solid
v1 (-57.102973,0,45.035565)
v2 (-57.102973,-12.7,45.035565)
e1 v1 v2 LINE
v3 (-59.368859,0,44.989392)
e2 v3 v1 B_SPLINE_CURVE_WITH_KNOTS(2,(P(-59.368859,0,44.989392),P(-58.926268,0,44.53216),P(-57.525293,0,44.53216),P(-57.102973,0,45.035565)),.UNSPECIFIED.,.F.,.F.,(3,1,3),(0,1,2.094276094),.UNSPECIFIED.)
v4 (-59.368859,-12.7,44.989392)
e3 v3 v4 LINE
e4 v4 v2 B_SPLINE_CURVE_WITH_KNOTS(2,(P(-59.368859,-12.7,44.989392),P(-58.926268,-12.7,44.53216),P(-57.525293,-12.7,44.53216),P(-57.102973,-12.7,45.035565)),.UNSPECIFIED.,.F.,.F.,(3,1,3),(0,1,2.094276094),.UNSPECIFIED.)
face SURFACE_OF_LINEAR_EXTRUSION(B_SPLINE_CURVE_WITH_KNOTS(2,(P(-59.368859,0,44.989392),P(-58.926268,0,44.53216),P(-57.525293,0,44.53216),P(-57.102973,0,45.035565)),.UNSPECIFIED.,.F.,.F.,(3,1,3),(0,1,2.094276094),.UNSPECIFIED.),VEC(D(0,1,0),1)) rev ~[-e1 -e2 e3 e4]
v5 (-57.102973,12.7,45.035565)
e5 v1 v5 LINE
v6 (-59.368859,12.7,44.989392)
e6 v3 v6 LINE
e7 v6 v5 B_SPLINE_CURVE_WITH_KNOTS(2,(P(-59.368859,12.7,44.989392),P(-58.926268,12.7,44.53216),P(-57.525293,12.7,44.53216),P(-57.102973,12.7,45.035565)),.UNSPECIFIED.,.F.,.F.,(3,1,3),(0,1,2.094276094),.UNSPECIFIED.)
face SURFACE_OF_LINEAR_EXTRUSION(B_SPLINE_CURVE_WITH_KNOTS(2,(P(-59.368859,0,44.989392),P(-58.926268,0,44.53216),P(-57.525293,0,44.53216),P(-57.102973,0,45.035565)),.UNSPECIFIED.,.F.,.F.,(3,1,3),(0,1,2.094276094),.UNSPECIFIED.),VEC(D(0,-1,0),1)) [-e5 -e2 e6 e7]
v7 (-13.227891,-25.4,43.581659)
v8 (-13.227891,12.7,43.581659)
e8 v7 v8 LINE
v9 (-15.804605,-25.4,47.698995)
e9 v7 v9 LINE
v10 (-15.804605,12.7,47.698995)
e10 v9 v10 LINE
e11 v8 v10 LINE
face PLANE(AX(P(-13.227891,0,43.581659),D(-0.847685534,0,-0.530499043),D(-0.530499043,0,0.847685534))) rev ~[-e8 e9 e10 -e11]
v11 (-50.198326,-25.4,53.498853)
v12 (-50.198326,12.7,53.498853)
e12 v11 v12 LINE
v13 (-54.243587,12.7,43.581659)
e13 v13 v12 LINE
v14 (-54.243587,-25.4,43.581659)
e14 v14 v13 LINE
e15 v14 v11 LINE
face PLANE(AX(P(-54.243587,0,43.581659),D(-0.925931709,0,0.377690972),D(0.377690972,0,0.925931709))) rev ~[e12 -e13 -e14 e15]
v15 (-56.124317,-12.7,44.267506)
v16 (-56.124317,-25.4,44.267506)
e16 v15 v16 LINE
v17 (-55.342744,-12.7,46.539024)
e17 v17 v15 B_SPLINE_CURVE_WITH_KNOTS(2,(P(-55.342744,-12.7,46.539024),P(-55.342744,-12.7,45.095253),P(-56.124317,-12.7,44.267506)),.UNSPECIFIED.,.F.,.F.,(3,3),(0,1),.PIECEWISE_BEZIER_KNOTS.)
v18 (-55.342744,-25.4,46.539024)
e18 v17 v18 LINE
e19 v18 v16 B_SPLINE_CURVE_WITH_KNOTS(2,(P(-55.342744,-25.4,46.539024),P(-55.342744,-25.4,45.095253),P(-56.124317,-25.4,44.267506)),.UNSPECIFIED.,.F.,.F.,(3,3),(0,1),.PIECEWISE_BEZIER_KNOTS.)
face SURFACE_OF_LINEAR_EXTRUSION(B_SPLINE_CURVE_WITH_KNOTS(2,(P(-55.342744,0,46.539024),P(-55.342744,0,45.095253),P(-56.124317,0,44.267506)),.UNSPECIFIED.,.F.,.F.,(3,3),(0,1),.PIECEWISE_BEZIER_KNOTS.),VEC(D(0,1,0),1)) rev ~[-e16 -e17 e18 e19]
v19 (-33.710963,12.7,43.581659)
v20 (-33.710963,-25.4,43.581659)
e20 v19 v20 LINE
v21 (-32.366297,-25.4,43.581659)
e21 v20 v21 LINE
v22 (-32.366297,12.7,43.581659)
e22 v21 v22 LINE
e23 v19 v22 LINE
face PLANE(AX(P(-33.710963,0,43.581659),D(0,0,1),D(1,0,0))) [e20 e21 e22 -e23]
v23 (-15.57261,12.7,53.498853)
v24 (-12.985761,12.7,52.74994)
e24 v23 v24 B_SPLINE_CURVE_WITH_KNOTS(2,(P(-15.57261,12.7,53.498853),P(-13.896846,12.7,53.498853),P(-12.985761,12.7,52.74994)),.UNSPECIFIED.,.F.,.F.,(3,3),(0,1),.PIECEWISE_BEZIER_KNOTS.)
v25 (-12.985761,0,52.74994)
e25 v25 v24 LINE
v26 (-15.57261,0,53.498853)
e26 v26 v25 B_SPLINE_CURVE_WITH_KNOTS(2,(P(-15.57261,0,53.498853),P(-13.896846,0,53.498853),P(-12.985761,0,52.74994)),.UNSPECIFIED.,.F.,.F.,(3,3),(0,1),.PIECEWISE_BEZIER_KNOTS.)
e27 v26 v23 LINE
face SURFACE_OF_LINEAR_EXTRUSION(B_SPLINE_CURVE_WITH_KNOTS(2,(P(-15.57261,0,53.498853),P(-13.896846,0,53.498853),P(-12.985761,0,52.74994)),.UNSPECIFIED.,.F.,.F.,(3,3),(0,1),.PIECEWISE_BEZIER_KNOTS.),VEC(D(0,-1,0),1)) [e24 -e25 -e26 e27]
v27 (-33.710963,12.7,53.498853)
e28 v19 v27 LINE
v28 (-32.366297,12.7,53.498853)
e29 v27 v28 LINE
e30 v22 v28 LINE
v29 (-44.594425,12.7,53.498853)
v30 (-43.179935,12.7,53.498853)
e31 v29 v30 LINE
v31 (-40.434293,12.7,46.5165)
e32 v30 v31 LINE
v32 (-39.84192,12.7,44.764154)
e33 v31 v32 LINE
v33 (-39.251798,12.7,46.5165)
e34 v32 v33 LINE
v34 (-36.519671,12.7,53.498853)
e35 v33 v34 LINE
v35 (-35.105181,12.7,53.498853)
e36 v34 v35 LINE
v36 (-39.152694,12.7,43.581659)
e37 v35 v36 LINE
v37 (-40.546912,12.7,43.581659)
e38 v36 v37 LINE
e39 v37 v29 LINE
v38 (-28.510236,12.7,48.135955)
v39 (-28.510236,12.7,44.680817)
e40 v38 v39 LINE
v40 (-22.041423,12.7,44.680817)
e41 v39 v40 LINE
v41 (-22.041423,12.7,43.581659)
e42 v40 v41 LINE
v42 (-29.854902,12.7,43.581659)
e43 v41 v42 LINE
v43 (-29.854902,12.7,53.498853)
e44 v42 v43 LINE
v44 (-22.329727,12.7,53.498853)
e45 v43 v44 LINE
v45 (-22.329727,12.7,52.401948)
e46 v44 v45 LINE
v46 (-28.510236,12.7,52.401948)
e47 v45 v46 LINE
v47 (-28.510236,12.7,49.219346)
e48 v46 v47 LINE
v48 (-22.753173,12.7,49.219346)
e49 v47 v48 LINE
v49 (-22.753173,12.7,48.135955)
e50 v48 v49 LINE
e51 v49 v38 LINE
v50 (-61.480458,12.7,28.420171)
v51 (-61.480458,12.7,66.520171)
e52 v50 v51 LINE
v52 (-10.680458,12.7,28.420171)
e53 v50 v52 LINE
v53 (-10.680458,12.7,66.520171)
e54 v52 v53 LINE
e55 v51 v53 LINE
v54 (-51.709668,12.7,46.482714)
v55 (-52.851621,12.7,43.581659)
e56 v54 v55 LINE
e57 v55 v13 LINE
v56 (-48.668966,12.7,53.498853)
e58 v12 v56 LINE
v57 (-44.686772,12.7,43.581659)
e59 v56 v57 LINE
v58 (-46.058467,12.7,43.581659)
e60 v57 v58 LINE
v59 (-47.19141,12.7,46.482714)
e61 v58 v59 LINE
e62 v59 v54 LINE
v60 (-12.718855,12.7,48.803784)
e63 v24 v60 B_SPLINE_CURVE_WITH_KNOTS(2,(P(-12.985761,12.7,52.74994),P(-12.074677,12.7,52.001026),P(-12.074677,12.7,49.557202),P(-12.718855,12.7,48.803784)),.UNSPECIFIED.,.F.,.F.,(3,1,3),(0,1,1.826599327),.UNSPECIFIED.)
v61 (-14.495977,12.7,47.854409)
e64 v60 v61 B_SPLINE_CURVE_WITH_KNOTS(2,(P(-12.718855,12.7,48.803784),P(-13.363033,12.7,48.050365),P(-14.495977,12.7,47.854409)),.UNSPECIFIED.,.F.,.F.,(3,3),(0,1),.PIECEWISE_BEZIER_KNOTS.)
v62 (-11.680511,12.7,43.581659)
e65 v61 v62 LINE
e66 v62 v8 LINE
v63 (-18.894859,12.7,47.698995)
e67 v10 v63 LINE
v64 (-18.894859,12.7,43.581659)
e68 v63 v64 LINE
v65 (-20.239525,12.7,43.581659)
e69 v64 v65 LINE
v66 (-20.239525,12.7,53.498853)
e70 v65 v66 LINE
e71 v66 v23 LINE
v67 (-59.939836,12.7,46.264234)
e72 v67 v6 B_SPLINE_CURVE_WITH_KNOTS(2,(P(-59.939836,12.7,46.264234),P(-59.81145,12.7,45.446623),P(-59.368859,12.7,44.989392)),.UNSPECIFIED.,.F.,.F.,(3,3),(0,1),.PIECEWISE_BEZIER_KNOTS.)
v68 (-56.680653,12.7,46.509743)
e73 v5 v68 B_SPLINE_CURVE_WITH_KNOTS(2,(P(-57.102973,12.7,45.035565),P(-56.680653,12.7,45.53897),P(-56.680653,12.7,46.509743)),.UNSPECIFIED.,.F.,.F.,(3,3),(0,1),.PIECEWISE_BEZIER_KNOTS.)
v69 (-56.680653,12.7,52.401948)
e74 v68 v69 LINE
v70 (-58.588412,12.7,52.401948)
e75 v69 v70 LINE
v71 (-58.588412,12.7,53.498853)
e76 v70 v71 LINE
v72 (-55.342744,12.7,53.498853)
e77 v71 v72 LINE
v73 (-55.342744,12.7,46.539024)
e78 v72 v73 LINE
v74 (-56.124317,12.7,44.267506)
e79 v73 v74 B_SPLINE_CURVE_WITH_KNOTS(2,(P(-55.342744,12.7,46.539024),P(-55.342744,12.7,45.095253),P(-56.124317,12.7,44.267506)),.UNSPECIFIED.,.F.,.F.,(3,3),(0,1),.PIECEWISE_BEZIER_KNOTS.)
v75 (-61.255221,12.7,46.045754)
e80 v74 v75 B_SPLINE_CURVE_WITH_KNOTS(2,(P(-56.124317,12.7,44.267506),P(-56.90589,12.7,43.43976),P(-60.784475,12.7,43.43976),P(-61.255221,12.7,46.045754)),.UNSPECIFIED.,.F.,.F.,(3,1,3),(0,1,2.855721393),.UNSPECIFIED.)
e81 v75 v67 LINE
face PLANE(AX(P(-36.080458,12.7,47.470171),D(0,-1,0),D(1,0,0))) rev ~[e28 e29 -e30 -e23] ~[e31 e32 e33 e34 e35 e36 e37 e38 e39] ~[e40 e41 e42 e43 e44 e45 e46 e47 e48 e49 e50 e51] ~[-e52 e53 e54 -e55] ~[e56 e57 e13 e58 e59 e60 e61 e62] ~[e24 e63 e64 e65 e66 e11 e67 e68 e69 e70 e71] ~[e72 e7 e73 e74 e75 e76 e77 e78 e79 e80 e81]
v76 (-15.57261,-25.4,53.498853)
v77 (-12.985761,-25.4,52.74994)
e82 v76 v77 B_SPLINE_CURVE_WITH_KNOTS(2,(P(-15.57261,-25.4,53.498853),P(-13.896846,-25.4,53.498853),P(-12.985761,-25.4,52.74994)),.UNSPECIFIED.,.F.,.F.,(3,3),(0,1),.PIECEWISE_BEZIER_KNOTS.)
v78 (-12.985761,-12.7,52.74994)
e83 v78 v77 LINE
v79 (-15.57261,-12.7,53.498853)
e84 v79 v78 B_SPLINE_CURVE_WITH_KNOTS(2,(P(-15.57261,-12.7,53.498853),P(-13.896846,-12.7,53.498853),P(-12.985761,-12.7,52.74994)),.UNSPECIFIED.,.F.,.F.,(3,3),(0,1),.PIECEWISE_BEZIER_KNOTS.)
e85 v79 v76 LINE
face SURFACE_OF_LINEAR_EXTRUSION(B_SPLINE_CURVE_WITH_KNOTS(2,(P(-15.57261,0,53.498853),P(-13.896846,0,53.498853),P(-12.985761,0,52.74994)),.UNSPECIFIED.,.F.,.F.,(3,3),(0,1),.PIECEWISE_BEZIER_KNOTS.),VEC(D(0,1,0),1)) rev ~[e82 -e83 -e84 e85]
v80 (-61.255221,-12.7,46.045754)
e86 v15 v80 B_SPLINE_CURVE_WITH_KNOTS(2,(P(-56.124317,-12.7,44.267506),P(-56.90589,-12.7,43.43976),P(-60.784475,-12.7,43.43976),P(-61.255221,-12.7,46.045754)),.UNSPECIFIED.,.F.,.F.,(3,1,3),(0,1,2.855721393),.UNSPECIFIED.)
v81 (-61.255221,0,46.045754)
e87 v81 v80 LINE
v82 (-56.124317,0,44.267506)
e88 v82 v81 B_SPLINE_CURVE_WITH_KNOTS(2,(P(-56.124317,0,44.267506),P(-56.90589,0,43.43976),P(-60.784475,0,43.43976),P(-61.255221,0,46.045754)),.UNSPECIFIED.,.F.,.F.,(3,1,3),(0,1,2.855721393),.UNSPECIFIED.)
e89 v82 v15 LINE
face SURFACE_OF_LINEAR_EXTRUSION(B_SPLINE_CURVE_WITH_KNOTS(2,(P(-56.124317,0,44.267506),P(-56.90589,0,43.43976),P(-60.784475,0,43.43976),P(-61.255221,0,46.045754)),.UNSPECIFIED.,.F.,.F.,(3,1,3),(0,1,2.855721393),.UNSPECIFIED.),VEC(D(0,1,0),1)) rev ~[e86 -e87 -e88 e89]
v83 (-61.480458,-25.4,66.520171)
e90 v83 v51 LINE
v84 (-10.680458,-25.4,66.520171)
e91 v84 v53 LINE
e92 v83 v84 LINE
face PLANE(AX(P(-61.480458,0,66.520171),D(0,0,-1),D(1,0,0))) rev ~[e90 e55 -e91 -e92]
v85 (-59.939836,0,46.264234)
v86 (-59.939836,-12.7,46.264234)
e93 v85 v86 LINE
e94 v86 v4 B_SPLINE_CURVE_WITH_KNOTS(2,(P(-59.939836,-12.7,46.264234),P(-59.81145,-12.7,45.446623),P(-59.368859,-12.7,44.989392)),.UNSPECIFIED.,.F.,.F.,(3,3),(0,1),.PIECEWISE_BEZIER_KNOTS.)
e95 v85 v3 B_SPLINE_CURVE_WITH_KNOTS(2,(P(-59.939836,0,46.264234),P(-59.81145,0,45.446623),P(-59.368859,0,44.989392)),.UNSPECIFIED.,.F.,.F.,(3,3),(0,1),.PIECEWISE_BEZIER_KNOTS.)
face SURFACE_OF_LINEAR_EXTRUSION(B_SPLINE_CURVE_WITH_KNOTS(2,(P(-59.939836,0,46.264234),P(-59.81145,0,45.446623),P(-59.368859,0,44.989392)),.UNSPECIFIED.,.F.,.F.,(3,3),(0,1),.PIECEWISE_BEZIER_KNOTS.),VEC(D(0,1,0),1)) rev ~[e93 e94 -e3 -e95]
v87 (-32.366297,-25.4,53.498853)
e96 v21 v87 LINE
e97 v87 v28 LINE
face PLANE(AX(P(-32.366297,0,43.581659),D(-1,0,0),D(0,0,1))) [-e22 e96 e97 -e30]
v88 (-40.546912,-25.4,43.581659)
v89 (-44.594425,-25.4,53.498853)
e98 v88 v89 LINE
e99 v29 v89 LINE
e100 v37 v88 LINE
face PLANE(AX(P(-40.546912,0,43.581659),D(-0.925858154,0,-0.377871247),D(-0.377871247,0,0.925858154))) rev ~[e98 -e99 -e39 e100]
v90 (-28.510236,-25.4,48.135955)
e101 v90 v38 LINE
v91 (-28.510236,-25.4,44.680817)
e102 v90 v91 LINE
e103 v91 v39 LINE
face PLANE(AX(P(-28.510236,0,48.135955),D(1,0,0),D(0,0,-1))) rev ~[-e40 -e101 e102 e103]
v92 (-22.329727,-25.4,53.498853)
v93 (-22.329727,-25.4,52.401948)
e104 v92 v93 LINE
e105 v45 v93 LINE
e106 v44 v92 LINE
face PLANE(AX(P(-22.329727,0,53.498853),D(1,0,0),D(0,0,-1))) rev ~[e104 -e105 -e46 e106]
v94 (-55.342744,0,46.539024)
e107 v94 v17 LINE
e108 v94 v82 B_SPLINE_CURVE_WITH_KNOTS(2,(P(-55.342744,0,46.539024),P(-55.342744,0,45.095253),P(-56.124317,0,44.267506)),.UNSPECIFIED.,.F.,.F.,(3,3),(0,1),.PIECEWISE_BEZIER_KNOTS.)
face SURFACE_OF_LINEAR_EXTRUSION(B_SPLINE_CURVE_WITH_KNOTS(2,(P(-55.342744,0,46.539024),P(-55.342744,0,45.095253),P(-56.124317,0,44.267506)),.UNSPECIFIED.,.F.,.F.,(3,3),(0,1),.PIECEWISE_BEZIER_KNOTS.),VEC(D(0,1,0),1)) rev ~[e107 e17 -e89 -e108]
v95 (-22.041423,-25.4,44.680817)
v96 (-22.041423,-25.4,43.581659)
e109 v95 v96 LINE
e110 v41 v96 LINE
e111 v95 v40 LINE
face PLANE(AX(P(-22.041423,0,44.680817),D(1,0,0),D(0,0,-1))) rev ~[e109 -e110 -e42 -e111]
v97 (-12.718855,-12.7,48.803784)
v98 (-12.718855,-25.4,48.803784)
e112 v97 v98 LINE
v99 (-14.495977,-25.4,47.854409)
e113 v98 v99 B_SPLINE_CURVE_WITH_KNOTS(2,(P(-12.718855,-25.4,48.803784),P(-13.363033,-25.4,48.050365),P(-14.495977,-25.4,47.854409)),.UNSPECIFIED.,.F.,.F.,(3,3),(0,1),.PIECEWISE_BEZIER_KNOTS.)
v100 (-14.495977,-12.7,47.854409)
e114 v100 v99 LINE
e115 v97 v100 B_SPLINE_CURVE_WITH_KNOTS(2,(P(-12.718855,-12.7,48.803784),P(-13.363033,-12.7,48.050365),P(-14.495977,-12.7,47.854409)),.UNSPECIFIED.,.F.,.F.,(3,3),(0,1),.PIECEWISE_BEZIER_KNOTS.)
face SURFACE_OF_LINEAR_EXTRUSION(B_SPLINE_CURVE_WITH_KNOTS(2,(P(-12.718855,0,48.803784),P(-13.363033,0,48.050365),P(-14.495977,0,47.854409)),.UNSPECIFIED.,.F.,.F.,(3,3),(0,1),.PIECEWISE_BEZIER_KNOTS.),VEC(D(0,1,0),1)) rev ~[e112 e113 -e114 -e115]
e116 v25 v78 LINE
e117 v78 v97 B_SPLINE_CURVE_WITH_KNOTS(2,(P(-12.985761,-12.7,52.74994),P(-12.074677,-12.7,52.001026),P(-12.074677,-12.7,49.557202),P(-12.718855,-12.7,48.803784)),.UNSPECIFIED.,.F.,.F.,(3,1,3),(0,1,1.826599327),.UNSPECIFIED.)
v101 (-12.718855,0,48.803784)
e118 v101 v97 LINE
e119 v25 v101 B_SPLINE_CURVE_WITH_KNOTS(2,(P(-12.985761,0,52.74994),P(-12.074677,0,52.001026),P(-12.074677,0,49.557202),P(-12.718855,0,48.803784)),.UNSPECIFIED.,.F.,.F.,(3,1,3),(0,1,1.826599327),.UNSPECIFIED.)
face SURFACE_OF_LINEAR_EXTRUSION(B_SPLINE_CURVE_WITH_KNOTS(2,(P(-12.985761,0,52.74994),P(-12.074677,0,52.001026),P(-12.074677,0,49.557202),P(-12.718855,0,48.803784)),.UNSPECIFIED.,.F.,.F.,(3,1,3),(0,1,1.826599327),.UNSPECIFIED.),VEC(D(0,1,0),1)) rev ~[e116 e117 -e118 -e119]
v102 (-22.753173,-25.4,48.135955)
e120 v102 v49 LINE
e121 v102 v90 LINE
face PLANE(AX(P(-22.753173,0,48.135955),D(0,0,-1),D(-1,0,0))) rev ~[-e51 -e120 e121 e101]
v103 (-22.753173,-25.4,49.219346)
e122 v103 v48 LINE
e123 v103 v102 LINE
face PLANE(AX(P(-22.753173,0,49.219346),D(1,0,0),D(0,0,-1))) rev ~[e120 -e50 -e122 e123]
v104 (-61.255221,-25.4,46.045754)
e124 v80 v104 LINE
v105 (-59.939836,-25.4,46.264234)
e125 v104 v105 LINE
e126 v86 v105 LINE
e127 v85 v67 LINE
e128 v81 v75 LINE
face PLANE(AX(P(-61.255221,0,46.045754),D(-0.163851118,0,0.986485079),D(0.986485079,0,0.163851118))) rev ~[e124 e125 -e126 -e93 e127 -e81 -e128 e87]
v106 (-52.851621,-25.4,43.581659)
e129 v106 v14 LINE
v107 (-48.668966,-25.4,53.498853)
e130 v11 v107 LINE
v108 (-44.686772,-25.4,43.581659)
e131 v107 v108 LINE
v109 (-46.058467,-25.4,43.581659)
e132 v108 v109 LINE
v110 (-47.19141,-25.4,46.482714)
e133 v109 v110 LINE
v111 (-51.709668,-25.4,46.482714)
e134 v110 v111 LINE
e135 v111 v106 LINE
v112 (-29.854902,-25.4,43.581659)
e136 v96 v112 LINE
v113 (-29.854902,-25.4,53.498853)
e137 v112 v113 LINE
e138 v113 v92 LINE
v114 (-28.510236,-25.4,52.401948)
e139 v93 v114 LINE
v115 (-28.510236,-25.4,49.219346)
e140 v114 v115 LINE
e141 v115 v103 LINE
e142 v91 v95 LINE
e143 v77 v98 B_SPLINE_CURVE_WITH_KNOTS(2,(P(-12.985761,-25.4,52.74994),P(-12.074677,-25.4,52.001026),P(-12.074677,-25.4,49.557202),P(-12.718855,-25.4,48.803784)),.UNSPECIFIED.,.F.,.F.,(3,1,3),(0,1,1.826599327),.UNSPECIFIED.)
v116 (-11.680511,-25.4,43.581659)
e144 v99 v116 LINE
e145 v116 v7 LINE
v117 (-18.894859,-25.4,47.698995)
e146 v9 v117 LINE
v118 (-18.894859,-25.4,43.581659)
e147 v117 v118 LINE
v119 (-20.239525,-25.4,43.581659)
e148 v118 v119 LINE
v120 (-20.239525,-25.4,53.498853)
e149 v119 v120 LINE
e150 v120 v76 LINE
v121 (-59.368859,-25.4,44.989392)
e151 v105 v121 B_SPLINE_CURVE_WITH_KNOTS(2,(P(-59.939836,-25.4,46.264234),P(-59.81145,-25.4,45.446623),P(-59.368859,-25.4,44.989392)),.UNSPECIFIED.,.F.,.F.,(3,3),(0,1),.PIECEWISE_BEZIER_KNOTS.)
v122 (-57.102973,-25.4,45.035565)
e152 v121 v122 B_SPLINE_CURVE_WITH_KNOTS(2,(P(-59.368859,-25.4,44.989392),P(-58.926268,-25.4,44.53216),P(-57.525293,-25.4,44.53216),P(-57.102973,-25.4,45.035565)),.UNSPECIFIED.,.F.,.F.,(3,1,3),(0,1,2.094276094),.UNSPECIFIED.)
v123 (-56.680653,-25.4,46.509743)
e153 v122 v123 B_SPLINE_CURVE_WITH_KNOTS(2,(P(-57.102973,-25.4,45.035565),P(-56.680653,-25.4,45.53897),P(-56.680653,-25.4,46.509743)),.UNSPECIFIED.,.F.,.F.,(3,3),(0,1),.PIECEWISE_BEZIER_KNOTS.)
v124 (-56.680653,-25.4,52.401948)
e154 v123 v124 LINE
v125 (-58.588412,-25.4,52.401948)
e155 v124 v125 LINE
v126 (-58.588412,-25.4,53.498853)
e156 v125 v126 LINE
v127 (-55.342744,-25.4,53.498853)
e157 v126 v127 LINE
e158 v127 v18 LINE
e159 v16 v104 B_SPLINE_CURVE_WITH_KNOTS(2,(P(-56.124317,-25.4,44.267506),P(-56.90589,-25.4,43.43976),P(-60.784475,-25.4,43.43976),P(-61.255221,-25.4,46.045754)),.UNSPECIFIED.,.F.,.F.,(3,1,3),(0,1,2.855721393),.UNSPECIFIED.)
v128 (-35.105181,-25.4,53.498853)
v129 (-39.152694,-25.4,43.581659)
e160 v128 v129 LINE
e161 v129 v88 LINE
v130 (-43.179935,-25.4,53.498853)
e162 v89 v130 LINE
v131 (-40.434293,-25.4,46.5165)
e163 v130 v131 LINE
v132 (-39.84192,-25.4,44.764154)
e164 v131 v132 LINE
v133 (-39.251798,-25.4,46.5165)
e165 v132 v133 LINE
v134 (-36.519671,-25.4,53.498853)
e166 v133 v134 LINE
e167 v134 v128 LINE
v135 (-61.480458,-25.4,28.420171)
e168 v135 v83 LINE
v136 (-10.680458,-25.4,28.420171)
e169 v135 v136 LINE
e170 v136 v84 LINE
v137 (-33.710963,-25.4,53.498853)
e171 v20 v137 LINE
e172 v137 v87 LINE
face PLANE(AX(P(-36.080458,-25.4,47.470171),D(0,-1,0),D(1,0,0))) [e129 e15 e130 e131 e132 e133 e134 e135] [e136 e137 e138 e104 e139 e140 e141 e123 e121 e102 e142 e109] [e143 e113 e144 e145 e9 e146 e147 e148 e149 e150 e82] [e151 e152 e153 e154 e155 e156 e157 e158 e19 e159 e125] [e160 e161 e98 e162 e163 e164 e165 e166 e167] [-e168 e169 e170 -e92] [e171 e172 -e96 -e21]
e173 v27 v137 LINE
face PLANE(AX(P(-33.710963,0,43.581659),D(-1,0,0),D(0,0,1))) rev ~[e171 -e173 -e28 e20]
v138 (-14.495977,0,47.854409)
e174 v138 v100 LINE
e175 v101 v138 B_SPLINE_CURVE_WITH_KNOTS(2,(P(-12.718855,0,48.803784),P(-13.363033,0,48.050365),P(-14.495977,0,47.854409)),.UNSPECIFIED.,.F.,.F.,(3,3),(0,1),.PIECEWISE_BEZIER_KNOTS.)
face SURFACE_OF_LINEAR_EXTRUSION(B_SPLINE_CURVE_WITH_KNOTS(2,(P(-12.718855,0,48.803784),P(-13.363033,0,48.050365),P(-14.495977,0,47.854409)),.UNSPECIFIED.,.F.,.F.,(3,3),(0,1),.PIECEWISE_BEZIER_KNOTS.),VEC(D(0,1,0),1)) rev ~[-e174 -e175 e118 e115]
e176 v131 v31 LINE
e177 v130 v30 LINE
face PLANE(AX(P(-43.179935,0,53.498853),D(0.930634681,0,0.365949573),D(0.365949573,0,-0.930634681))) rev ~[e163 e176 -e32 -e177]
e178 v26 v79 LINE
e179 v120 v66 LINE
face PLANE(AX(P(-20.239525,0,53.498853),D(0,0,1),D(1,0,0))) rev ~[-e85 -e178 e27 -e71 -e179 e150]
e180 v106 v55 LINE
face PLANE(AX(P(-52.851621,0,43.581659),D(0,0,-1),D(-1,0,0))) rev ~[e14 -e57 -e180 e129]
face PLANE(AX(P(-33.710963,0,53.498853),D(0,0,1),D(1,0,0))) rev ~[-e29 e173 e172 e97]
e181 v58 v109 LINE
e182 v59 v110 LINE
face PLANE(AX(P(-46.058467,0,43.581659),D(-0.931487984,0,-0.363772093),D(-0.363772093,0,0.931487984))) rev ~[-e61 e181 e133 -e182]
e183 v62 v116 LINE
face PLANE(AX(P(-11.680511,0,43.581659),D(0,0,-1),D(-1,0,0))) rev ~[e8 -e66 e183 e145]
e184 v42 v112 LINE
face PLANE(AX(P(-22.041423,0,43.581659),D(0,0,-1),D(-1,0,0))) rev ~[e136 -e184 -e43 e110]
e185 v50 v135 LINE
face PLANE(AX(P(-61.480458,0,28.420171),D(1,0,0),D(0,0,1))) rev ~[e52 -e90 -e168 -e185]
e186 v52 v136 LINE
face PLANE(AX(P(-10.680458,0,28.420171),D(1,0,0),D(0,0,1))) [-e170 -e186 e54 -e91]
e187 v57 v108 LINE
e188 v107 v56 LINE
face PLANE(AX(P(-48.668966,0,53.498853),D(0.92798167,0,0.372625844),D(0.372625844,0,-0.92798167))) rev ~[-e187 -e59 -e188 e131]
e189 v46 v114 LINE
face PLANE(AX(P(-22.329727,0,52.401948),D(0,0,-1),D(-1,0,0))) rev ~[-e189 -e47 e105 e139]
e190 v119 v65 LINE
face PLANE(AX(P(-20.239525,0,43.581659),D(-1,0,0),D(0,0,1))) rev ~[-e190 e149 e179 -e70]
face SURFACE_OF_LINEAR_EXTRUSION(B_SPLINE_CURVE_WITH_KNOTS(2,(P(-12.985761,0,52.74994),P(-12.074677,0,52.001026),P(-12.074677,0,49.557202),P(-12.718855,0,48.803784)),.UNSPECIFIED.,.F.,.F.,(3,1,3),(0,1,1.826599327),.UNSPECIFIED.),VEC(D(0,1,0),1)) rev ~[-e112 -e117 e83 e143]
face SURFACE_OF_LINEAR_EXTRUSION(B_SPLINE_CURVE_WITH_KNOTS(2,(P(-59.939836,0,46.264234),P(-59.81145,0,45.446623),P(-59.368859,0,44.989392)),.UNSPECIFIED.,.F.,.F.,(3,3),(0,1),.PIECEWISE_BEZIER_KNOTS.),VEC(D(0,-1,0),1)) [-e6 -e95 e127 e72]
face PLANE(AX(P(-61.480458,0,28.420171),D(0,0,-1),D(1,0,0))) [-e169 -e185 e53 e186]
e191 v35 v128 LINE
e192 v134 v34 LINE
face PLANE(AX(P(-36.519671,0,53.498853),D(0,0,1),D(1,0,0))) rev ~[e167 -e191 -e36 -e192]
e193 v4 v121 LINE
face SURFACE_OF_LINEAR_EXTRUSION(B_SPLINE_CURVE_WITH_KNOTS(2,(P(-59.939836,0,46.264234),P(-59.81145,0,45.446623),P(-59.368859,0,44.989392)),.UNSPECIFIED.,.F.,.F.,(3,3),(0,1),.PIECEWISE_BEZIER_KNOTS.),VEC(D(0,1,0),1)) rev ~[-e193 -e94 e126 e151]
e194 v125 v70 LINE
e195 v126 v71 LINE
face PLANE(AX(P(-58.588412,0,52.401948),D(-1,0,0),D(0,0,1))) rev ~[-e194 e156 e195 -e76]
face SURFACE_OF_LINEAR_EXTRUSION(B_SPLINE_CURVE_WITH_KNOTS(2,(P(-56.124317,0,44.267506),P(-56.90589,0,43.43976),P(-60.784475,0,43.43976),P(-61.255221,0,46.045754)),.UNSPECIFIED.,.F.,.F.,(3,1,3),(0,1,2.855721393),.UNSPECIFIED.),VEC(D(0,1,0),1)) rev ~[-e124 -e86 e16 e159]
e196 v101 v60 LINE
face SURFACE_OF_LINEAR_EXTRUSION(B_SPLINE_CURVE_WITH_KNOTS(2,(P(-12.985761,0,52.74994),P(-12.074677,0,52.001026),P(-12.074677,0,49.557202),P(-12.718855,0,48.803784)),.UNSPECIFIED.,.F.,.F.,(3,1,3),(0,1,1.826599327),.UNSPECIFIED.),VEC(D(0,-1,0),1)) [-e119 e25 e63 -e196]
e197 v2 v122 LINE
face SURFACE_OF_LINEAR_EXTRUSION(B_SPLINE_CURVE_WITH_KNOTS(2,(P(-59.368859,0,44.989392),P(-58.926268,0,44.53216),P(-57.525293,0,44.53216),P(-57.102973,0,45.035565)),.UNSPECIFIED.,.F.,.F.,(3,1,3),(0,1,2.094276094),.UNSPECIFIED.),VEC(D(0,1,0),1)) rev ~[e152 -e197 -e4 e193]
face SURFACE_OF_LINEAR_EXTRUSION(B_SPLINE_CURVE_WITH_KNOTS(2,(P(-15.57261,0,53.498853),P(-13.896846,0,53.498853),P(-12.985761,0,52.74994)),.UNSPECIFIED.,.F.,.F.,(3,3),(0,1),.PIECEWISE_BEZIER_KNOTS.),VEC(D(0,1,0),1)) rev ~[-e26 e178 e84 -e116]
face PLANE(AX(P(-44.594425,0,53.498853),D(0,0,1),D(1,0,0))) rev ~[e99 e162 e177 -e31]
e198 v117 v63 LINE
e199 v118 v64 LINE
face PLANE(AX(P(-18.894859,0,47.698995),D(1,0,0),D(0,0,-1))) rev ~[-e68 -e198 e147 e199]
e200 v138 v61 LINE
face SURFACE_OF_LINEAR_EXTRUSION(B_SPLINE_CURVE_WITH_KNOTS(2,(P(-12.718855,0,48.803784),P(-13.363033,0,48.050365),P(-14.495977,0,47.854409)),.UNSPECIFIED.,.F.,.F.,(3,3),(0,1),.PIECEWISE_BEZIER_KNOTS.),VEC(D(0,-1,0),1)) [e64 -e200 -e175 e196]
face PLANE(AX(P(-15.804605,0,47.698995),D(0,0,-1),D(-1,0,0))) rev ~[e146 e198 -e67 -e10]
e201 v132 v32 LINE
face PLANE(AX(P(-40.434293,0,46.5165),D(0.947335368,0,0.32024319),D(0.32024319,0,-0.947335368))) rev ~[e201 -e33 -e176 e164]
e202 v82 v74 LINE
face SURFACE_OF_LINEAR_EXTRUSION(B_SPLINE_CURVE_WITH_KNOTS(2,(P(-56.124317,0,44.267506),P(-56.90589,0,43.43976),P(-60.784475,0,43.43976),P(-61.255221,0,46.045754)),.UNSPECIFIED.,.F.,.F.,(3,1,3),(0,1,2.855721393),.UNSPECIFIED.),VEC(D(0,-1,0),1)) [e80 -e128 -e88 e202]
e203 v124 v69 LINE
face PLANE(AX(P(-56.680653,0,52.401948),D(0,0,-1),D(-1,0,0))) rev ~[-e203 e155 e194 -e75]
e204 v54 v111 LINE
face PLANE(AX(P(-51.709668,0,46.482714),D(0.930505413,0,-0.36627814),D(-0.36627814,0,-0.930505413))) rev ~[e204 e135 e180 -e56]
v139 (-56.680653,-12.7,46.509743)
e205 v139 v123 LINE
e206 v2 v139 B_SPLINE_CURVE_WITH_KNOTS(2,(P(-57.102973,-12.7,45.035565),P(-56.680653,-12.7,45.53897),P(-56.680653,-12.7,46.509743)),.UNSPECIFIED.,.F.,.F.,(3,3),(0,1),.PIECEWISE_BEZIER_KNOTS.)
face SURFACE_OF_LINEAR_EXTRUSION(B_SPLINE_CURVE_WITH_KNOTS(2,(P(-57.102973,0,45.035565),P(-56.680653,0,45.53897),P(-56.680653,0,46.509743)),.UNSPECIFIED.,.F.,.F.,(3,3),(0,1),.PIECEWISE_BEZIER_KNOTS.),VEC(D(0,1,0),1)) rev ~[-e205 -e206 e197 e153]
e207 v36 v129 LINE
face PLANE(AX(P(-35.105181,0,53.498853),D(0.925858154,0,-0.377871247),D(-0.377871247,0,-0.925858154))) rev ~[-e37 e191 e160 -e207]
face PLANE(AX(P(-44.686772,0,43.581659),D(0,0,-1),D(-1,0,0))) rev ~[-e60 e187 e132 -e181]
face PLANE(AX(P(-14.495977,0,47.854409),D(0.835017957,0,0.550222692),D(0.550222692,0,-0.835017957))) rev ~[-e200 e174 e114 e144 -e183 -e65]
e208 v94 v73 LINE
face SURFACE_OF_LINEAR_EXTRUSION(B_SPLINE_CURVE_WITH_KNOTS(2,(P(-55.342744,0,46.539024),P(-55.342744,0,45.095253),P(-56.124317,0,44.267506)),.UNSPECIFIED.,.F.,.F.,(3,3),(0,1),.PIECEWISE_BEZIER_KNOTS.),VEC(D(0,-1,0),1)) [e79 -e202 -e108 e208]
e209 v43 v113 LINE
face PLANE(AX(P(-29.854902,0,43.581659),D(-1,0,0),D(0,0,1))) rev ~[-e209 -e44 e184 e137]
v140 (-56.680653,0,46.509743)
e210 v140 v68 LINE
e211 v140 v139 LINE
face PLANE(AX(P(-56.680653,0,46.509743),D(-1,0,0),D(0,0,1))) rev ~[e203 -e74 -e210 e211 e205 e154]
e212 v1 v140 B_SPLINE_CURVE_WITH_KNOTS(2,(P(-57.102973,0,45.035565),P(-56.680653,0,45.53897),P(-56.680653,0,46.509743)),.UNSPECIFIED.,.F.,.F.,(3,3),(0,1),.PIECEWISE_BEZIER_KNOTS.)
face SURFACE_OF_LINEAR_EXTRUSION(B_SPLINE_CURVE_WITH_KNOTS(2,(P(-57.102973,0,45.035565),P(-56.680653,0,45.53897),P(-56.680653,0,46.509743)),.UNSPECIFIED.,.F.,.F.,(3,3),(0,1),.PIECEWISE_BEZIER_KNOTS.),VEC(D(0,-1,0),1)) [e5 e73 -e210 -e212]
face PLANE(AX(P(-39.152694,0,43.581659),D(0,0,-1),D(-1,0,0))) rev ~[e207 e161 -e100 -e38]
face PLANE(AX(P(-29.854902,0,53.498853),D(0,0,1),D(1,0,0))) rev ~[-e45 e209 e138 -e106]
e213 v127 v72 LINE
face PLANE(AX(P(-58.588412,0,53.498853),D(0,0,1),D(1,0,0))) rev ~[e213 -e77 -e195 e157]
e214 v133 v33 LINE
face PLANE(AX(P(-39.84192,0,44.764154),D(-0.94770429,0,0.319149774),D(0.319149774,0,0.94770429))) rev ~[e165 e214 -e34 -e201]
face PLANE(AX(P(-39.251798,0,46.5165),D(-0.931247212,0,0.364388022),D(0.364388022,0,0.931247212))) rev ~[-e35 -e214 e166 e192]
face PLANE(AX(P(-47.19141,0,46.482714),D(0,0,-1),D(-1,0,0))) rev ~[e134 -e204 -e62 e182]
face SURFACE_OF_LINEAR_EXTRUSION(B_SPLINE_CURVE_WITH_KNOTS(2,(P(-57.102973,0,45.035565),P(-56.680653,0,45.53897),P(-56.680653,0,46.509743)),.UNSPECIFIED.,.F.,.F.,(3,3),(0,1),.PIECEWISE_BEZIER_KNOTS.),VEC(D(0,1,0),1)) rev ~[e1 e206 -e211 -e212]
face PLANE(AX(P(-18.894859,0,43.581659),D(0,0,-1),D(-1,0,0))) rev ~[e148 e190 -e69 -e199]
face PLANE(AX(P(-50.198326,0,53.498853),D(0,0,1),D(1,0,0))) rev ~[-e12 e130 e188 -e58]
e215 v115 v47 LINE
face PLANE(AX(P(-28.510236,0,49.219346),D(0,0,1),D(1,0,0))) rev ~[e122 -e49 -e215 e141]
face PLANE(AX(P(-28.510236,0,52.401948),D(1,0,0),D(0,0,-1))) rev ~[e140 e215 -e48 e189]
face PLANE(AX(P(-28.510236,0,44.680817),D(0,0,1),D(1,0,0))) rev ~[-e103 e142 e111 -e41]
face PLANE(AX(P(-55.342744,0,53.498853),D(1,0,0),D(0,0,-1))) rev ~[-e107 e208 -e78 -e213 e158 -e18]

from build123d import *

# Parameters (mm, degrees)
F0_W     = 50.8
F0_H     = 38.1
F0_W_2   = 1.3446661346
F0_H_2   = 9.9171942893
F1_DEPTH = 12.7
F2_DEPTH = 25.4


with BuildPart() as f1:
    # F0 (on Front) → F1 (new body, symmetric)
    with BuildSketch(Plane.XZ):
        with Locations((-36.0804582015, 47.4701705396)):
            Rectangle(F0_W, F0_H)
        with BuildLine():
            add(Edge.make_bspline(
                [(-56.1243173839, 44.267506293), (-56.9058904973, 43.4397595518), (-58.2640708644, 43.4397595518)],
                knots=[0, 0, 0, 1, 1, 1], degree=2))
            add(Edge.make_bspline(
                [(-58.2640708644, 43.4397595518), (-60.7844752273, 43.4397595518), (-61.255220993, 46.0457540539)],
                knots=[0, 0, 0, 1, 1, 1], degree=2))
            Line((-61.255220993, 46.0457540539), (-59.9398356955, 46.2642341461))
            add(Edge.make_bspline(
                [(-59.9398356955, 46.2642341461), (-59.8114504867, 45.4466230794), (-59.368859372, 44.9893915462)],
                knots=[0, 0, 0, 1, 1, 1], degree=2))
            add(Edge.make_bspline(
                [(-59.368859372, 44.9893915462), (-58.9262682573, 44.5321600129), (-58.2573137482, 44.5321600129)],
                knots=[0, 0, 0, 1, 1, 1], degree=2))
            add(Edge.make_bspline(
                [(-58.2573137482, 44.5321600129), (-57.5252928206, 44.5321600129), (-57.1029730547, 45.0355651739)],
                knots=[0, 0, 0, 1, 1, 1], degree=2))
            add(Edge.make_bspline(
                [(-57.1029730547, 45.0355651739), (-56.6806532888, 45.5389703348), (-56.6806532888, 46.5097427034)],
                knots=[0, 0, 0, 1, 1, 1], degree=2))
            Line((-56.6806532888, 46.5097427034), (-56.6806532888, 52.4019480771))
            Line((-56.6806532888, 52.4019480771), (-58.5884124446, 52.4019480771))
            Line((-58.5884124446, 52.4019480771), (-58.5884124446, 53.4988532824))
            Line((-58.5884124446, 53.4988532824), (-55.3427442705, 53.4988532824))
            Line((-55.3427442705, 53.4988532824), (-55.3427442705, 46.5390235405))
            add(Edge.make_bspline(
                [(-55.3427442705, 46.5390235405), (-55.3427442705, 45.0952530341), (-56.1243173839, 44.267506293)],
                knots=[0, 0, 0, 1, 1, 1], degree=2))
        make_face(mode=Mode.SUBTRACT)
        Polygon((-44.6867719374, 43.5816589932), (-46.058466537, 43.5816589932), (-47.1914096957, 46.4827142384), (-51.7096680977, 46.4827142384), (-52.8516207447, 43.5816589932), (-54.2435866931, 43.5816589932), (-50.1983264288, 53.4988532824), (-48.6689657833, 53.4988532824), align=None, mode=Mode.SUBTRACT)
        Polygon((-35.1051810888, 53.4988532824), (-39.1526937251, 43.5816589932), (-40.5469120456, 43.5816589932), (-44.5944246819, 53.4988532824), (-43.1799350127, 53.4988532824), (-40.4342934413, 46.5164998196), (-39.841919583, 44.7641543377), (-39.2517980968, 46.5164998196), (-36.519670758, 53.4988532824), align=None, mode=Mode.SUBTRACT)
        with Locations((-33.038629701, 48.5402561378)):
            Rectangle(F0_W_2, F0_H_2, mode=Mode.SUBTRACT)
        Polygon((-22.0414229971, 43.5816589932), (-29.8549017592, 43.5816589932), (-29.8549017592, 53.4988532824), (-22.3297266239, 53.4988532824), (-22.3297266239, 52.4019480771), (-28.5102356245, 52.4019480771), (-28.5102356245, 49.2193463214), (-22.7531725759, 49.2193463214), (-22.7531725759, 48.1359553486), (-28.5102356245, 48.1359553486), (-28.5102356245, 44.6808165705), (-22.0414229971, 44.6808165705), align=None, mode=Mode.SUBTRACT)
        with BuildLine():
            Line((-11.6805114071, 43.5816589932), (-13.2278910293, 43.5816589932))
            Line((-13.2278910293, 43.5816589932), (-15.8046046943, 47.6989951641))
            Line((-15.8046046943, 47.6989951641), (-18.8948591946, 47.6989951641))
            Line((-18.8948591946, 47.6989951641), (-18.8948591946, 43.5816589932))
            Line((-18.8948591946, 43.5816589932), (-20.2395253293, 43.5816589932))
            Line((-20.2395253293, 43.5816589932), (-20.2395253293, 53.4988532824))
            Line((-20.2395253293, 53.4988532824), (-15.5726103696, 53.4988532824))
            add(Edge.make_bspline(
                [(-15.5726103696, 53.4988532824), (-13.8968455385, 53.4988532824), (-12.9857610302, 52.7499395642)],
                knots=[0, 0, 0, 1, 1, 1], degree=2))
            add(Edge.make_bspline(
                [(-12.9857610302, 52.7499395642), (-12.0746765219, 52.0010258461), (-12.0746765219, 50.6631168277)],
                knots=[0, 0, 0, 1, 1, 1], degree=2))
            add(Edge.make_bspline(
                [(-12.0746765219, 50.6631168277), (-12.0746765219, 49.5572021341), (-12.7188549382, 48.8037836717)],
                knots=[0, 0, 0, 1, 1, 1], degree=2))
            add(Edge.make_bspline(
                [(-12.7188549382, 48.8037836717), (-13.3630333544, 48.0503652094), (-14.4959765131, 47.854408838)],
                knots=[0, 0, 0, 1, 1, 1], degree=2))
            Line((-14.4959765131, 47.854408838), (-11.6805114071, 43.5816589932))
        make_face(mode=Mode.SUBTRACT)
    extrude(amount=F1_DEPTH, both=True)

    # F0 (on Front) → F2 (join)
    with BuildSketch(Plane.XZ):
        with Locations((-36.0804582015, 47.4701705396)):
            Rectangle(F0_W, F0_H)
        with BuildLine():
            add(Edge.make_bspline(
                [(-56.1243173839, 44.267506293), (-56.9058904973, 43.4397595518), (-58.2640708644, 43.4397595518)],
                knots=[0, 0, 0, 1, 1, 1], degree=2))
            add(Edge.make_bspline(
                [(-58.2640708644, 43.4397595518), (-60.7844752273, 43.4397595518), (-61.255220993, 46.0457540539)],
                knots=[0, 0, 0, 1, 1, 1], degree=2))
            Line((-61.255220993, 46.0457540539), (-59.9398356955, 46.2642341461))
            add(Edge.make_bspline(
                [(-59.9398356955, 46.2642341461), (-59.8114504867, 45.4466230794), (-59.368859372, 44.9893915462)],
                knots=[0, 0, 0, 1, 1, 1], degree=2))
            add(Edge.make_bspline(
                [(-59.368859372, 44.9893915462), (-58.9262682573, 44.5321600129), (-58.2573137482, 44.5321600129)],
                knots=[0, 0, 0, 1, 1, 1], degree=2))
            add(Edge.make_bspline(
                [(-58.2573137482, 44.5321600129), (-57.5252928206, 44.5321600129), (-57.1029730547, 45.0355651739)],
                knots=[0, 0, 0, 1, 1, 1], degree=2))
            add(Edge.make_bspline(
                [(-57.1029730547, 45.0355651739), (-56.6806532888, 45.5389703348), (-56.6806532888, 46.5097427034)],
                knots=[0, 0, 0, 1, 1, 1], degree=2))
            Line((-56.6806532888, 46.5097427034), (-56.6806532888, 52.4019480771))
            Line((-56.6806532888, 52.4019480771), (-58.5884124446, 52.4019480771))
            Line((-58.5884124446, 52.4019480771), (-58.5884124446, 53.4988532824))
            Line((-58.5884124446, 53.4988532824), (-55.3427442705, 53.4988532824))
            Line((-55.3427442705, 53.4988532824), (-55.3427442705, 46.5390235405))
            add(Edge.make_bspline(
                [(-55.3427442705, 46.5390235405), (-55.3427442705, 45.0952530341), (-56.1243173839, 44.267506293)],
                knots=[0, 0, 0, 1, 1, 1], degree=2))
        make_face(mode=Mode.SUBTRACT)
        Polygon((-44.6867719374, 43.5816589932), (-46.058466537, 43.5816589932), (-47.1914096957, 46.4827142384), (-51.7096680977, 46.4827142384), (-52.8516207447, 43.5816589932), (-54.2435866931, 43.5816589932), (-50.1983264288, 53.4988532824), (-48.6689657833, 53.4988532824), align=None, mode=Mode.SUBTRACT)
        Polygon((-35.1051810888, 53.4988532824), (-39.1526937251, 43.5816589932), (-40.5469120456, 43.5816589932), (-44.5944246819, 53.4988532824), (-43.1799350127, 53.4988532824), (-40.4342934413, 46.5164998196), (-39.841919583, 44.7641543377), (-39.2517980968, 46.5164998196), (-36.519670758, 53.4988532824), align=None, mode=Mode.SUBTRACT)
        with Locations((-33.038629701, 48.5402561378)):
            Rectangle(F0_W_2, F0_H_2, mode=Mode.SUBTRACT)
        Polygon((-22.0414229971, 43.5816589932), (-29.8549017592, 43.5816589932), (-29.8549017592, 53.4988532824), (-22.3297266239, 53.4988532824), (-22.3297266239, 52.4019480771), (-28.5102356245, 52.4019480771), (-28.5102356245, 49.2193463214), (-22.7531725759, 49.2193463214), (-22.7531725759, 48.1359553486), (-28.5102356245, 48.1359553486), (-28.5102356245, 44.6808165705), (-22.0414229971, 44.6808165705), align=None, mode=Mode.SUBTRACT)
        with BuildLine():
            Line((-11.6805114071, 43.5816589932), (-13.2278910293, 43.5816589932))
            Line((-13.2278910293, 43.5816589932), (-15.8046046943, 47.6989951641))
            Line((-15.8046046943, 47.6989951641), (-18.8948591946, 47.6989951641))
            Line((-18.8948591946, 47.6989951641), (-18.8948591946, 43.5816589932))
            Line((-18.8948591946, 43.5816589932), (-20.2395253293, 43.5816589932))
            Line((-20.2395253293, 43.5816589932), (-20.2395253293, 53.4988532824))
            Line((-20.2395253293, 53.4988532824), (-15.5726103696, 53.4988532824))
            add(Edge.make_bspline(
                [(-15.5726103696, 53.4988532824), (-13.8968455385, 53.4988532824), (-12.9857610302, 52.7499395642)],
                knots=[0, 0, 0, 1, 1, 1], degree=2))
            add(Edge.make_bspline(
                [(-12.9857610302, 52.7499395642), (-12.0746765219, 52.0010258461), (-12.0746765219, 50.6631168277)],
                knots=[0, 0, 0, 1, 1, 1], degree=2))
            add(Edge.make_bspline(
                [(-12.0746765219, 50.6631168277), (-12.0746765219, 49.5572021341), (-12.7188549382, 48.8037836717)],
                knots=[0, 0, 0, 1, 1, 1], degree=2))
            add(Edge.make_bspline(
                [(-12.7188549382, 48.8037836717), (-13.3630333544, 48.0503652094), (-14.4959765131, 47.854408838)],
                knots=[0, 0, 0, 1, 1, 1], degree=2))
            Line((-14.4959765131, 47.854408838), (-11.6805114071, 43.5816589932))
        make_face(mode=Mode.SUBTRACT)
    extrude(amount=F2_DEPTH)


solid = f1.part
